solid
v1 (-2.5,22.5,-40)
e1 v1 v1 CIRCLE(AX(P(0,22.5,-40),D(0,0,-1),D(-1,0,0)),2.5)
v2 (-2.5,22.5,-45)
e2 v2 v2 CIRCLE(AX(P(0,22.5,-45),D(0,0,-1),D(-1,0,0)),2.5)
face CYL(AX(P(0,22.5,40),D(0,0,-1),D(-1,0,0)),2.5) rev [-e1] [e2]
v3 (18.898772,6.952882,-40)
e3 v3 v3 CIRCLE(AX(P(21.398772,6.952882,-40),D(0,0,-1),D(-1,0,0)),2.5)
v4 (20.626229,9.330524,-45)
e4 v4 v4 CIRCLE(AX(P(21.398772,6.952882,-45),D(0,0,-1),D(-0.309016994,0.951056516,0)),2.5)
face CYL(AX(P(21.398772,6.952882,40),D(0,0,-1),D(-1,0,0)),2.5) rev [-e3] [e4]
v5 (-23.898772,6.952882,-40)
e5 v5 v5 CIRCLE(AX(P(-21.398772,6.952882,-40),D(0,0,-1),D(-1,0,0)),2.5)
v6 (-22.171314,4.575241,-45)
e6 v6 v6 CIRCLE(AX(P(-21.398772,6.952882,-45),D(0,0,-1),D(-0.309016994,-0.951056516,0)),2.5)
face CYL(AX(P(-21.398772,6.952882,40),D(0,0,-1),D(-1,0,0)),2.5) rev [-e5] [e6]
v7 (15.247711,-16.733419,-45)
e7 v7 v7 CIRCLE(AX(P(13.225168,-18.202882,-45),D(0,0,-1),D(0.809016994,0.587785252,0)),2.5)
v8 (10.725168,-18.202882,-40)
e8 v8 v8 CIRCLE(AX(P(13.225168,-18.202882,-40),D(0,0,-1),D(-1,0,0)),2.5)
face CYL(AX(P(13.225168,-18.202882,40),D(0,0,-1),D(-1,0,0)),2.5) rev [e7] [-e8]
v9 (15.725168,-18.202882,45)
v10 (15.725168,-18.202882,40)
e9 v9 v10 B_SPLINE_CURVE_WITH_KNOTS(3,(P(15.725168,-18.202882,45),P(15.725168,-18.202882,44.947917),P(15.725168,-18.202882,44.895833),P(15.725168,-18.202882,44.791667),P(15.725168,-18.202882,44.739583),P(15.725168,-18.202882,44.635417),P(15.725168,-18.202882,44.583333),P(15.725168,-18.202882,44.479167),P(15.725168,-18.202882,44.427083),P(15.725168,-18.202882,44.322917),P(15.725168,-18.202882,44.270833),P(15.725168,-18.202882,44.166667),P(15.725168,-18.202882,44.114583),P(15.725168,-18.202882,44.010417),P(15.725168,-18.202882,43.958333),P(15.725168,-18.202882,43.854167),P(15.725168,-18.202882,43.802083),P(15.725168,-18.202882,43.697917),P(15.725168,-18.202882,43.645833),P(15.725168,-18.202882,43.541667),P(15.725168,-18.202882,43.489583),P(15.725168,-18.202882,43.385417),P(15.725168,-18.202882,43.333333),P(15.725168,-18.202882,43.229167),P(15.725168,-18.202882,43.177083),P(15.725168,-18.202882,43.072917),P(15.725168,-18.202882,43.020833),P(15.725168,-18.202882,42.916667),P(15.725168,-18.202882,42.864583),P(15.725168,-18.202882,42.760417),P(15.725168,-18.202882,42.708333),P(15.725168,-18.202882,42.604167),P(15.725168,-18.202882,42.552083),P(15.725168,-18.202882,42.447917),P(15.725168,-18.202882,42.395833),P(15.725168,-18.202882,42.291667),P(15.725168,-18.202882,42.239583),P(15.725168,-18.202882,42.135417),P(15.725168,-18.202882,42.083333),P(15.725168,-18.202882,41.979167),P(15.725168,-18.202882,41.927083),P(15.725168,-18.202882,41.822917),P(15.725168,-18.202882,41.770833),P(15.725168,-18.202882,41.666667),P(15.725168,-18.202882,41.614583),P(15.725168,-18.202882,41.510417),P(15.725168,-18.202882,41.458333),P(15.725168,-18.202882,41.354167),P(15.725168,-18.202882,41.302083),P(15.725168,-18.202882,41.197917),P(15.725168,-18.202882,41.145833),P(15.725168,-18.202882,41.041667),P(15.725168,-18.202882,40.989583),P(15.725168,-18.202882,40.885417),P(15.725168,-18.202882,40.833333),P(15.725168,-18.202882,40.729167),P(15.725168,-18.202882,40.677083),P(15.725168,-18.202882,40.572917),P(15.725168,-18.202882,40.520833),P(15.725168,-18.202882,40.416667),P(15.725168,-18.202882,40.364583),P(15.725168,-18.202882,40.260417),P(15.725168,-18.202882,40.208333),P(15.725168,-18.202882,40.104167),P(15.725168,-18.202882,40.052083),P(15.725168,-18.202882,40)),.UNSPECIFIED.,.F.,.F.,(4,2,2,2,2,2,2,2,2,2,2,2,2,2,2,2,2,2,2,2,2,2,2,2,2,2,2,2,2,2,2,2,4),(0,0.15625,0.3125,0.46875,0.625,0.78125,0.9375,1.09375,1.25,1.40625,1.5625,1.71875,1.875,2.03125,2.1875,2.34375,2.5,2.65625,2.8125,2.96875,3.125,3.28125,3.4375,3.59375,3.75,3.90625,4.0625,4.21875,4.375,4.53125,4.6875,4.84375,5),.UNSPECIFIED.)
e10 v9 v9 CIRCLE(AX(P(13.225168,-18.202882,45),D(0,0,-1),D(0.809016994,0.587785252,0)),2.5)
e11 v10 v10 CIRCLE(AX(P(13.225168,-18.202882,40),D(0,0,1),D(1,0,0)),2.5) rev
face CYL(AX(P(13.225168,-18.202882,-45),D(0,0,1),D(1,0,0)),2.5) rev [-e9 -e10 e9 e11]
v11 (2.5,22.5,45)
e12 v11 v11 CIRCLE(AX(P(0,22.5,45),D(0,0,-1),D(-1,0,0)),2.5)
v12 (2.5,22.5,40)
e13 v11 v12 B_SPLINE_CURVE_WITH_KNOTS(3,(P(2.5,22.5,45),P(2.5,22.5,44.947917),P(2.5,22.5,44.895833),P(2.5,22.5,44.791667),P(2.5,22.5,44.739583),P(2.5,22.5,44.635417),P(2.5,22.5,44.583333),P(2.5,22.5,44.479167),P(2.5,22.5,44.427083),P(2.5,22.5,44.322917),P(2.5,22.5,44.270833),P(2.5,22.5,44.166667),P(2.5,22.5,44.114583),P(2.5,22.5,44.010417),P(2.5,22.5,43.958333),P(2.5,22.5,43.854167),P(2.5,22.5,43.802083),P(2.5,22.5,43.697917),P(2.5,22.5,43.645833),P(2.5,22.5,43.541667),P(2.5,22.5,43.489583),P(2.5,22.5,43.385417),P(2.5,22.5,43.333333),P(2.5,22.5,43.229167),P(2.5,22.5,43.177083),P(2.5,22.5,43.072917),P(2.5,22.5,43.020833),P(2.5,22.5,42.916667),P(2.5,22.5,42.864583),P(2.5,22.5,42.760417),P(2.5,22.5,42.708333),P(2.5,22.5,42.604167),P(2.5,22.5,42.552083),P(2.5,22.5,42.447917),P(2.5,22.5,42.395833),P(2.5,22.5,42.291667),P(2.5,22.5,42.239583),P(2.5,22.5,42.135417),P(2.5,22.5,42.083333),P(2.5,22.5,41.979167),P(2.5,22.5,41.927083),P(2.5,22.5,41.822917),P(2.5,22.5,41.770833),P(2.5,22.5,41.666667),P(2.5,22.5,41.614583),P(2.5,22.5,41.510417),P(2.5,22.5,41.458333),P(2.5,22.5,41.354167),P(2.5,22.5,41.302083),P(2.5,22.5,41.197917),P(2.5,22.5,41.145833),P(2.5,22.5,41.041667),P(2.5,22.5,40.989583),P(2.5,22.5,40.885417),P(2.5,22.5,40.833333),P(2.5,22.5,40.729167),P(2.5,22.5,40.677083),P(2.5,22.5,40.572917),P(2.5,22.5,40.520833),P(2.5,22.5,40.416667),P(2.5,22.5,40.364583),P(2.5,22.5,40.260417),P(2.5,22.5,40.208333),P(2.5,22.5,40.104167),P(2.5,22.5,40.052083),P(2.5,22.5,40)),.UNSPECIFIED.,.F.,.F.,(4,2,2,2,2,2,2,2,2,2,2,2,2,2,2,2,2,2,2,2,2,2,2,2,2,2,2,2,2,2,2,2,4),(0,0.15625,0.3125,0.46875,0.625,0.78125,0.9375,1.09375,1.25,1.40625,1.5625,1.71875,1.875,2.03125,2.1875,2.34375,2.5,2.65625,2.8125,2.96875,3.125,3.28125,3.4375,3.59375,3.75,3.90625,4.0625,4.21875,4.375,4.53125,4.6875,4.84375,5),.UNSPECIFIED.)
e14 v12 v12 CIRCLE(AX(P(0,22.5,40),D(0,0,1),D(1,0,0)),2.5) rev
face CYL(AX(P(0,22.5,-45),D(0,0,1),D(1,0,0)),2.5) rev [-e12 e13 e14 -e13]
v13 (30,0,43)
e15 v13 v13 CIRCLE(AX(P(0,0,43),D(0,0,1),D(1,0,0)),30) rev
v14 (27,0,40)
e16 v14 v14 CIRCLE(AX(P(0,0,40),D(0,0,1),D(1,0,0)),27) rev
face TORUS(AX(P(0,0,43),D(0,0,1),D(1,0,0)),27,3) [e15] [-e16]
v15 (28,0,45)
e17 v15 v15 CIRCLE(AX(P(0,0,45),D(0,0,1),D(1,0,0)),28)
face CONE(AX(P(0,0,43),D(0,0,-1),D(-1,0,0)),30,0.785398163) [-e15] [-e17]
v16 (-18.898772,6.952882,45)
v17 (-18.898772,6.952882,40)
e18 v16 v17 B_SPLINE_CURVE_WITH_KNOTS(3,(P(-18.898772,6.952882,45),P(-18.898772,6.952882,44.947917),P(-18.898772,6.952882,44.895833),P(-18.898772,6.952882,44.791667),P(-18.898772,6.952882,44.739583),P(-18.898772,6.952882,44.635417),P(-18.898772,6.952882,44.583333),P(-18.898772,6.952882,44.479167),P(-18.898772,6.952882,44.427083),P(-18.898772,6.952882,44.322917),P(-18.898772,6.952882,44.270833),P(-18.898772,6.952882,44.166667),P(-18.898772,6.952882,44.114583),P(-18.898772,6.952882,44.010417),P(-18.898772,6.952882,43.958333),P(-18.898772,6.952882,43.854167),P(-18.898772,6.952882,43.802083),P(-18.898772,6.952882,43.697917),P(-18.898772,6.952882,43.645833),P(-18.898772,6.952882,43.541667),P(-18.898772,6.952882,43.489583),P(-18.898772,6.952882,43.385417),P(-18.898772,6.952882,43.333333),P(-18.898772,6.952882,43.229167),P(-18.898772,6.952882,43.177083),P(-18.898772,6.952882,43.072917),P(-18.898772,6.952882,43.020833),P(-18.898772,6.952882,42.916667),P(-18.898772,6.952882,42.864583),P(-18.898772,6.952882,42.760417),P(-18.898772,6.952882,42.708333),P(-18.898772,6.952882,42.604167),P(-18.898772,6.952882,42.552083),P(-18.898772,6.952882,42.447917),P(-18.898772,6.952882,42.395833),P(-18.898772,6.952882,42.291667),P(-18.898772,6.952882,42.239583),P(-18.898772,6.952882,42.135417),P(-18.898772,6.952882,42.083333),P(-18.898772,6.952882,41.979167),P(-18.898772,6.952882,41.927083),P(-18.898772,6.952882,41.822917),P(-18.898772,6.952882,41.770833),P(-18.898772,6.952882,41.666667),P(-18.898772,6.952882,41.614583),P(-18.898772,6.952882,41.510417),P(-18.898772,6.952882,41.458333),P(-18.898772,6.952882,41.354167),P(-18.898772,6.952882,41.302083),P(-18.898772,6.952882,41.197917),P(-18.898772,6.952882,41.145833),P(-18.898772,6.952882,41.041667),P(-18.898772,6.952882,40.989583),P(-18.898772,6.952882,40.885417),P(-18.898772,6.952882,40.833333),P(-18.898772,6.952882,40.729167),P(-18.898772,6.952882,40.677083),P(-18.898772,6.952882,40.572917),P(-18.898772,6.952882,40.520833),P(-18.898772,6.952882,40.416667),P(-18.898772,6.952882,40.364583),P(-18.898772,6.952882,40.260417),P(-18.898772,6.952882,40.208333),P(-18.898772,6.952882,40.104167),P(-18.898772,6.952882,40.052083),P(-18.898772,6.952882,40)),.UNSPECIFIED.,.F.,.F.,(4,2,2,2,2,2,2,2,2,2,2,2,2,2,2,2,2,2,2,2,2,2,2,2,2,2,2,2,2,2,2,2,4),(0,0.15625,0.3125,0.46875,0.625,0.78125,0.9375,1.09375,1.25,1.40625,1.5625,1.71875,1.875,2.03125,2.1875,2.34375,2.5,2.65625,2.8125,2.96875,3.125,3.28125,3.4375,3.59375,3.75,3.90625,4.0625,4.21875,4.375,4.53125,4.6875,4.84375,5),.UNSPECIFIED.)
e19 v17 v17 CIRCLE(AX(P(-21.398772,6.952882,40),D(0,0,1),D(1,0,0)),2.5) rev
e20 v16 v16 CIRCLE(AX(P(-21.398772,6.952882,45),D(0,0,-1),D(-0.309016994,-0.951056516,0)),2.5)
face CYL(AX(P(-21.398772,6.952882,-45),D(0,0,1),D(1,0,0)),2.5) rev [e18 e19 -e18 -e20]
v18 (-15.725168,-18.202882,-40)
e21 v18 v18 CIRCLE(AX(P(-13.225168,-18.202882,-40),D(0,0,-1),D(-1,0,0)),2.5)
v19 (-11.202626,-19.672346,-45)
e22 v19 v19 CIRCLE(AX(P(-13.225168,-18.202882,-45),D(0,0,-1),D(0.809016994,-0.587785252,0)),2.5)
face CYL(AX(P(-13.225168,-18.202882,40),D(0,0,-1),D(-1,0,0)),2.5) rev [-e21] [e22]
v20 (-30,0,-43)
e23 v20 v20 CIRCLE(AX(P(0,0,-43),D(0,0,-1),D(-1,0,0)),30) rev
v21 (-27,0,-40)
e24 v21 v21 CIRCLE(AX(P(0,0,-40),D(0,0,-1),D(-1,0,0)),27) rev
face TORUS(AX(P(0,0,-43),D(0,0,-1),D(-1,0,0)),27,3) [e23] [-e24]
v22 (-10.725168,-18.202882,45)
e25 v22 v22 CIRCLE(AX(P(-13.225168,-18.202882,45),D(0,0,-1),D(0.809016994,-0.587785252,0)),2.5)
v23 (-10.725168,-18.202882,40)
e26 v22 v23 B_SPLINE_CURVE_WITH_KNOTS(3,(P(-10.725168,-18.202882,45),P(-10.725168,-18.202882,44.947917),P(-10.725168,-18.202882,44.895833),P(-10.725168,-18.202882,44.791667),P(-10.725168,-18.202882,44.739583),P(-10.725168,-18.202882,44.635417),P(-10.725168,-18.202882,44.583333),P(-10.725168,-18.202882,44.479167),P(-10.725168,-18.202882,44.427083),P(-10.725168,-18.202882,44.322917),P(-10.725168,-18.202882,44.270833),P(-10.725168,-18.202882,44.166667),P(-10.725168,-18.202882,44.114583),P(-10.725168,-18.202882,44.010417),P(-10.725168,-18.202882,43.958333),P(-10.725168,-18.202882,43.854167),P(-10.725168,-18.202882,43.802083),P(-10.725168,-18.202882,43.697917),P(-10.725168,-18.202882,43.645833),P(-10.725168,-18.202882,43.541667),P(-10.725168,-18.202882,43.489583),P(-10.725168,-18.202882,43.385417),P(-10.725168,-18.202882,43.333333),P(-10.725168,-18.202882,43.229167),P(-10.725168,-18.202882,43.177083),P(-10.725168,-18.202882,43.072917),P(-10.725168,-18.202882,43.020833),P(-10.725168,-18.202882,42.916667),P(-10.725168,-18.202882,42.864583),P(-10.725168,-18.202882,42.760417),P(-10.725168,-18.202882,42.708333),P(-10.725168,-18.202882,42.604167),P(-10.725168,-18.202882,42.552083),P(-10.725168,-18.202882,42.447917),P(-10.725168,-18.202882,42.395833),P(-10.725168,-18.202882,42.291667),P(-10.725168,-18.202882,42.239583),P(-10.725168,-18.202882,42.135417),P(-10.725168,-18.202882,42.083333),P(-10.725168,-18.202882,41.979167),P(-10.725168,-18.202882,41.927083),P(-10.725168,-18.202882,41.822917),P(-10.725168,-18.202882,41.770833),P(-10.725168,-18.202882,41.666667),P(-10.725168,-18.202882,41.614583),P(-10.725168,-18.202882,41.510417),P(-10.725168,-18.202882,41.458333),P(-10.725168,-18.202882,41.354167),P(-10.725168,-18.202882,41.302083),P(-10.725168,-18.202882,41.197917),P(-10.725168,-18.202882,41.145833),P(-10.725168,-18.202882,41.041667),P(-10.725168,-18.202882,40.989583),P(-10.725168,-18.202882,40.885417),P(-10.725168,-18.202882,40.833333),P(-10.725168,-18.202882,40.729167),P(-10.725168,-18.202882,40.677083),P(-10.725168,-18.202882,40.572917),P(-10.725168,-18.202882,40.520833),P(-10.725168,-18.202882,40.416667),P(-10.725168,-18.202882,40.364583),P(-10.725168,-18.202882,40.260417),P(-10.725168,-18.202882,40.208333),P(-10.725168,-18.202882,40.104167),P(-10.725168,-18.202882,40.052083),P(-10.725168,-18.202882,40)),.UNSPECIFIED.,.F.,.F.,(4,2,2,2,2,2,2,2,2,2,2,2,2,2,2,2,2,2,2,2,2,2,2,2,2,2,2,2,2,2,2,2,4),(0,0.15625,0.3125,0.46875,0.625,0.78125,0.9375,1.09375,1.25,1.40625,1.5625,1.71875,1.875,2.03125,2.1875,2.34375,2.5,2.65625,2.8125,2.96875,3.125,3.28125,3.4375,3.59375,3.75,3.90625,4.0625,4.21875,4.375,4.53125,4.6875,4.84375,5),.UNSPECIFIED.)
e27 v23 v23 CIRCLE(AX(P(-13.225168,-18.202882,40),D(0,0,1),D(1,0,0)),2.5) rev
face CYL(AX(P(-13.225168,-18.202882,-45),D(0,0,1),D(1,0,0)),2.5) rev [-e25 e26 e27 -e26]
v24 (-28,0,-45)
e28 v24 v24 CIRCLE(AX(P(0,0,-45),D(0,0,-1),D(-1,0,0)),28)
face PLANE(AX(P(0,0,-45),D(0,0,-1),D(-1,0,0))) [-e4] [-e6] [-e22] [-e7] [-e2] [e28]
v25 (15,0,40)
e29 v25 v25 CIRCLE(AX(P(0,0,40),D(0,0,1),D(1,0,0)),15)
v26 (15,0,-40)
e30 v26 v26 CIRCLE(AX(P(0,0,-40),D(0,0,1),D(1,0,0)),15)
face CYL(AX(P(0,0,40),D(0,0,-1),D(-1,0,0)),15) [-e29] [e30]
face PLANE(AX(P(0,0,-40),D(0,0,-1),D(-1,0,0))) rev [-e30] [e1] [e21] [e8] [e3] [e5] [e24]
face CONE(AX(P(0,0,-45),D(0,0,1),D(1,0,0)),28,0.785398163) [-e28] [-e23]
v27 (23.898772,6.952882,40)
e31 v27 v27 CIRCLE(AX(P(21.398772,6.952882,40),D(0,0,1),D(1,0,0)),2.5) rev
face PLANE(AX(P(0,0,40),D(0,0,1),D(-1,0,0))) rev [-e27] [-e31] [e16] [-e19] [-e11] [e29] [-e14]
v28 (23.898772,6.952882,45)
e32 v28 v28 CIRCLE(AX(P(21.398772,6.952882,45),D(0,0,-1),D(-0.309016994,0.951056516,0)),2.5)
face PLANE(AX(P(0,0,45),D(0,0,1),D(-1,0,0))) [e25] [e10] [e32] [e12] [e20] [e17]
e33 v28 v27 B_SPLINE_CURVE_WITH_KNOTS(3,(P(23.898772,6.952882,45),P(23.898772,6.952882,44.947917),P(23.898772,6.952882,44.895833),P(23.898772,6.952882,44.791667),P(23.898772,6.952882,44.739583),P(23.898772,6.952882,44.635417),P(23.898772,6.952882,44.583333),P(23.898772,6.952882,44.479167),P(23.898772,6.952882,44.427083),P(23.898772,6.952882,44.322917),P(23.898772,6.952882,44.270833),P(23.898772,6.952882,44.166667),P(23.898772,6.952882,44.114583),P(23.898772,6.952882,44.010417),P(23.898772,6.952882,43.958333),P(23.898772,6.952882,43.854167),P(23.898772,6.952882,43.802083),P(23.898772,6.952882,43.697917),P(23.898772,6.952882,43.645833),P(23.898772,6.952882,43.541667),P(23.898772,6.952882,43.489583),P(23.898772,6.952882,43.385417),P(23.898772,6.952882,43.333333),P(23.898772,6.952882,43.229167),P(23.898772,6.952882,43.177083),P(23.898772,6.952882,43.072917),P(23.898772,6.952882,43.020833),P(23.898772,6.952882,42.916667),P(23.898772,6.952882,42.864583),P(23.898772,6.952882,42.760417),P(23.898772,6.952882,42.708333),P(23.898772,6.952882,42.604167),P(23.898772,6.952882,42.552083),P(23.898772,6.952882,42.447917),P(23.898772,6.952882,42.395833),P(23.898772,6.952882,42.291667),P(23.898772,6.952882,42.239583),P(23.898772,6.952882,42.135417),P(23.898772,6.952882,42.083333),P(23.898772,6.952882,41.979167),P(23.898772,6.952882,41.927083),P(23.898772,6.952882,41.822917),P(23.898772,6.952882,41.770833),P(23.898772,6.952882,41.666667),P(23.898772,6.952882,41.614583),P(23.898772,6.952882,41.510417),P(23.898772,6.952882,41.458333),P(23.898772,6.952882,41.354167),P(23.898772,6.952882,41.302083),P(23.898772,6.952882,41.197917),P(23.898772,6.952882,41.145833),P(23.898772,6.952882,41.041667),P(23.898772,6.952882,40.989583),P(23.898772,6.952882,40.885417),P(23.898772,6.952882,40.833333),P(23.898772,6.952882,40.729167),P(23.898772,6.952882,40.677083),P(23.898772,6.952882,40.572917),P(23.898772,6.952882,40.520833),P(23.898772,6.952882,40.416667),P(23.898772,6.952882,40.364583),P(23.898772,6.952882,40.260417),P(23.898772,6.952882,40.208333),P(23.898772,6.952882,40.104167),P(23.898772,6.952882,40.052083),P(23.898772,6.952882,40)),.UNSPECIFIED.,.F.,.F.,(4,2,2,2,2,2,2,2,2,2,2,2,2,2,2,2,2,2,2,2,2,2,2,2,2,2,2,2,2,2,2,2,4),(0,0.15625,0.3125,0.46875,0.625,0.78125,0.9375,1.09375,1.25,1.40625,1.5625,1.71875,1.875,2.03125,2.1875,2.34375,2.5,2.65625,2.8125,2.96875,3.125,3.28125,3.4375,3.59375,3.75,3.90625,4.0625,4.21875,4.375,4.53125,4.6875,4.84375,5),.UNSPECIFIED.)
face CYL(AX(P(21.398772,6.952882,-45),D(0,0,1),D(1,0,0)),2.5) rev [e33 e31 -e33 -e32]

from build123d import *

# Parameters (mm, degrees)
SKETCH1_R                = 15
BOSS_EXTRUDE1_DEPTH      = 40
SKETCH2_R                = 30
BOSS_EXTRUDE2_DEPTH      = 5
CHAMFER1_SIZE            = 2
SKETCH5_R                = 2.5
CUT_EXTRUDE1_DEPTH       = 96
CIRPATTERN1_COUNT        = 5
FILLET1_R                = 3
MIRROR2_COPY_1_SKETCH_R  = 2.5
MIRROR2_COPY_1_DEPTH     = 96
MIRROR2_COPY_2_SKETCH_R  = 2.5
MIRROR2_COPY_2_DEPTH     = 96
MIRROR2_COPY_3_SKETCH_R  = 2.5
MIRROR2_COPY_3_DEPTH     = 96
MIRROR2_COPY_4_SKETCH_R  = 2.5
MIRROR2_COPY_4_DEPTH     = 96
CHAMFER1_OF_MIRROR2_SIZE = 2
FILLET1_OF_MIRROR2_R     = 3


with BuildPart() as part:
    # Sketch1 → Boss-Extrude1 (new, symmetric)
    with BuildSketch(Plane.XY):
        Circle(SKETCH1_R)
    extrude(amount=BOSS_EXTRUDE1_DEPTH, both=True)

    # Sketch2 → Boss-Extrude2 (add)
    with BuildSketch(Plane(origin=(0, 0, -40), x_dir=(-1, 0, 0), z_dir=(0, 0, -1))):
        Circle(SKETCH2_R)
    boss_extrude2 = extrude(amount=BOSS_EXTRUDE2_DEPTH)

    # Chamfer1
    chamfer1_edges = [part.edges().sort_by_distance(p)[0] for p in [
        (30, 0, -45),
    ]]
    chamfer(chamfer1_edges, length=CHAMFER1_SIZE)

    # Sketch5 → Cut-Extrude1 (cut, through all)
    with BuildSketch(Plane(origin=(0, 0, -45), x_dir=(-1, 0, 0), z_dir=(0, 0, -1))):
        with Locations((0, 22.5)):
            Circle(SKETCH5_R)
    cut_extrude1 = extrude(amount=-CUT_EXTRUDE1_DEPTH, mode=Mode.SUBTRACT)

    # CirPattern1: Cut-Extrude1 ×5 about axis
    cirpattern1_axis = Axis((0, 0, 0), (0, 0, 1))
    for i in range(1, CIRPATTERN1_COUNT):
        add(cut_extrude1.rotate(cirpattern1_axis, i * 360 / CIRPATTERN1_COUNT), mode=Mode.SUBTRACT)

    # Fillet1
    fillet1_edges = [part.edges().sort_by_distance(p)[0] for p in [
        (30, 0, -40),
    ]]
    fillet(fillet1_edges, radius=FILLET1_R - 0.0001)  # a hair under: the kernel refuses the full size

    # Mirror2: Boss-Extrude2, Cut-Extrude1 across plane
    add(boss_extrude2.mirror(Plane.XY))
    add(cut_extrude1.mirror(Plane.XY), mode=Mode.SUBTRACT)

    # Mirror2 copy 1 sketch → Mirror2 copy 1 (cut, through all)
    with BuildSketch(Plane(origin=(0, 0, 45), x_dir=(-0.30901699437494745, -0.9510565162951535, 0), z_dir=(0, 0, 1))):
        with Locations((0, -22.5)):
            Circle(MIRROR2_COPY_1_SKETCH_R)
    extrude(amount=-MIRROR2_COPY_1_DEPTH, mode=Mode.SUBTRACT)

    # Mirror2 copy 2 sketch → Mirror2 copy 2 (cut, through all)
    with BuildSketch(Plane(origin=(0, 0, 45), x_dir=(0.8090169943749473, -0.5877852522924732, 0), z_dir=(0, 0, 1))):
        with Locations((0, -22.5)):
            Circle(MIRROR2_COPY_2_SKETCH_R)
    extrude(amount=-MIRROR2_COPY_2_DEPTH, mode=Mode.SUBTRACT)

    # Mirror2 copy 3 sketch → Mirror2 copy 3 (cut, through all)
    with BuildSketch(Plane(origin=(0, 0, 45), x_dir=(0.8090169943749476, 0.587785252292473, 0), z_dir=(0, 0, 1))):
        with Locations((0, -22.5)):
            Circle(MIRROR2_COPY_3_SKETCH_R)
    extrude(amount=-MIRROR2_COPY_3_DEPTH, mode=Mode.SUBTRACT)

    # Mirror2 copy 4 sketch → Mirror2 copy 4 (cut, through all)
    with BuildSketch(Plane(origin=(0, 0, 45), x_dir=(-0.30901699437494723, 0.9510565162951536, 0), z_dir=(0, 0, 1))):
        with Locations((0, -22.5)):
            Circle(MIRROR2_COPY_4_SKETCH_R)
    extrude(amount=-MIRROR2_COPY_4_DEPTH, mode=Mode.SUBTRACT)

    # Chamfer1 of Mirror2
    chamfer1_of_mirror2_edges = [part.edges().sort_by_distance(p)[0] for p in [
        (30, 0, 45),
    ]]
    chamfer(chamfer1_of_mirror2_edges, length=CHAMFER1_OF_MIRROR2_SIZE)

    # Fillet1 of Mirror2
    fillet1_of_mirror2_edges = [part.edges().sort_by_distance(p)[0] for p in [
        (30, 0, 40),
    ]]
    fillet(fillet1_of_mirror2_edges, radius=FILLET1_OF_MIRROR2_R - 0.0001)  # a hair under: the kernel refuses the full size


solid = part.part
